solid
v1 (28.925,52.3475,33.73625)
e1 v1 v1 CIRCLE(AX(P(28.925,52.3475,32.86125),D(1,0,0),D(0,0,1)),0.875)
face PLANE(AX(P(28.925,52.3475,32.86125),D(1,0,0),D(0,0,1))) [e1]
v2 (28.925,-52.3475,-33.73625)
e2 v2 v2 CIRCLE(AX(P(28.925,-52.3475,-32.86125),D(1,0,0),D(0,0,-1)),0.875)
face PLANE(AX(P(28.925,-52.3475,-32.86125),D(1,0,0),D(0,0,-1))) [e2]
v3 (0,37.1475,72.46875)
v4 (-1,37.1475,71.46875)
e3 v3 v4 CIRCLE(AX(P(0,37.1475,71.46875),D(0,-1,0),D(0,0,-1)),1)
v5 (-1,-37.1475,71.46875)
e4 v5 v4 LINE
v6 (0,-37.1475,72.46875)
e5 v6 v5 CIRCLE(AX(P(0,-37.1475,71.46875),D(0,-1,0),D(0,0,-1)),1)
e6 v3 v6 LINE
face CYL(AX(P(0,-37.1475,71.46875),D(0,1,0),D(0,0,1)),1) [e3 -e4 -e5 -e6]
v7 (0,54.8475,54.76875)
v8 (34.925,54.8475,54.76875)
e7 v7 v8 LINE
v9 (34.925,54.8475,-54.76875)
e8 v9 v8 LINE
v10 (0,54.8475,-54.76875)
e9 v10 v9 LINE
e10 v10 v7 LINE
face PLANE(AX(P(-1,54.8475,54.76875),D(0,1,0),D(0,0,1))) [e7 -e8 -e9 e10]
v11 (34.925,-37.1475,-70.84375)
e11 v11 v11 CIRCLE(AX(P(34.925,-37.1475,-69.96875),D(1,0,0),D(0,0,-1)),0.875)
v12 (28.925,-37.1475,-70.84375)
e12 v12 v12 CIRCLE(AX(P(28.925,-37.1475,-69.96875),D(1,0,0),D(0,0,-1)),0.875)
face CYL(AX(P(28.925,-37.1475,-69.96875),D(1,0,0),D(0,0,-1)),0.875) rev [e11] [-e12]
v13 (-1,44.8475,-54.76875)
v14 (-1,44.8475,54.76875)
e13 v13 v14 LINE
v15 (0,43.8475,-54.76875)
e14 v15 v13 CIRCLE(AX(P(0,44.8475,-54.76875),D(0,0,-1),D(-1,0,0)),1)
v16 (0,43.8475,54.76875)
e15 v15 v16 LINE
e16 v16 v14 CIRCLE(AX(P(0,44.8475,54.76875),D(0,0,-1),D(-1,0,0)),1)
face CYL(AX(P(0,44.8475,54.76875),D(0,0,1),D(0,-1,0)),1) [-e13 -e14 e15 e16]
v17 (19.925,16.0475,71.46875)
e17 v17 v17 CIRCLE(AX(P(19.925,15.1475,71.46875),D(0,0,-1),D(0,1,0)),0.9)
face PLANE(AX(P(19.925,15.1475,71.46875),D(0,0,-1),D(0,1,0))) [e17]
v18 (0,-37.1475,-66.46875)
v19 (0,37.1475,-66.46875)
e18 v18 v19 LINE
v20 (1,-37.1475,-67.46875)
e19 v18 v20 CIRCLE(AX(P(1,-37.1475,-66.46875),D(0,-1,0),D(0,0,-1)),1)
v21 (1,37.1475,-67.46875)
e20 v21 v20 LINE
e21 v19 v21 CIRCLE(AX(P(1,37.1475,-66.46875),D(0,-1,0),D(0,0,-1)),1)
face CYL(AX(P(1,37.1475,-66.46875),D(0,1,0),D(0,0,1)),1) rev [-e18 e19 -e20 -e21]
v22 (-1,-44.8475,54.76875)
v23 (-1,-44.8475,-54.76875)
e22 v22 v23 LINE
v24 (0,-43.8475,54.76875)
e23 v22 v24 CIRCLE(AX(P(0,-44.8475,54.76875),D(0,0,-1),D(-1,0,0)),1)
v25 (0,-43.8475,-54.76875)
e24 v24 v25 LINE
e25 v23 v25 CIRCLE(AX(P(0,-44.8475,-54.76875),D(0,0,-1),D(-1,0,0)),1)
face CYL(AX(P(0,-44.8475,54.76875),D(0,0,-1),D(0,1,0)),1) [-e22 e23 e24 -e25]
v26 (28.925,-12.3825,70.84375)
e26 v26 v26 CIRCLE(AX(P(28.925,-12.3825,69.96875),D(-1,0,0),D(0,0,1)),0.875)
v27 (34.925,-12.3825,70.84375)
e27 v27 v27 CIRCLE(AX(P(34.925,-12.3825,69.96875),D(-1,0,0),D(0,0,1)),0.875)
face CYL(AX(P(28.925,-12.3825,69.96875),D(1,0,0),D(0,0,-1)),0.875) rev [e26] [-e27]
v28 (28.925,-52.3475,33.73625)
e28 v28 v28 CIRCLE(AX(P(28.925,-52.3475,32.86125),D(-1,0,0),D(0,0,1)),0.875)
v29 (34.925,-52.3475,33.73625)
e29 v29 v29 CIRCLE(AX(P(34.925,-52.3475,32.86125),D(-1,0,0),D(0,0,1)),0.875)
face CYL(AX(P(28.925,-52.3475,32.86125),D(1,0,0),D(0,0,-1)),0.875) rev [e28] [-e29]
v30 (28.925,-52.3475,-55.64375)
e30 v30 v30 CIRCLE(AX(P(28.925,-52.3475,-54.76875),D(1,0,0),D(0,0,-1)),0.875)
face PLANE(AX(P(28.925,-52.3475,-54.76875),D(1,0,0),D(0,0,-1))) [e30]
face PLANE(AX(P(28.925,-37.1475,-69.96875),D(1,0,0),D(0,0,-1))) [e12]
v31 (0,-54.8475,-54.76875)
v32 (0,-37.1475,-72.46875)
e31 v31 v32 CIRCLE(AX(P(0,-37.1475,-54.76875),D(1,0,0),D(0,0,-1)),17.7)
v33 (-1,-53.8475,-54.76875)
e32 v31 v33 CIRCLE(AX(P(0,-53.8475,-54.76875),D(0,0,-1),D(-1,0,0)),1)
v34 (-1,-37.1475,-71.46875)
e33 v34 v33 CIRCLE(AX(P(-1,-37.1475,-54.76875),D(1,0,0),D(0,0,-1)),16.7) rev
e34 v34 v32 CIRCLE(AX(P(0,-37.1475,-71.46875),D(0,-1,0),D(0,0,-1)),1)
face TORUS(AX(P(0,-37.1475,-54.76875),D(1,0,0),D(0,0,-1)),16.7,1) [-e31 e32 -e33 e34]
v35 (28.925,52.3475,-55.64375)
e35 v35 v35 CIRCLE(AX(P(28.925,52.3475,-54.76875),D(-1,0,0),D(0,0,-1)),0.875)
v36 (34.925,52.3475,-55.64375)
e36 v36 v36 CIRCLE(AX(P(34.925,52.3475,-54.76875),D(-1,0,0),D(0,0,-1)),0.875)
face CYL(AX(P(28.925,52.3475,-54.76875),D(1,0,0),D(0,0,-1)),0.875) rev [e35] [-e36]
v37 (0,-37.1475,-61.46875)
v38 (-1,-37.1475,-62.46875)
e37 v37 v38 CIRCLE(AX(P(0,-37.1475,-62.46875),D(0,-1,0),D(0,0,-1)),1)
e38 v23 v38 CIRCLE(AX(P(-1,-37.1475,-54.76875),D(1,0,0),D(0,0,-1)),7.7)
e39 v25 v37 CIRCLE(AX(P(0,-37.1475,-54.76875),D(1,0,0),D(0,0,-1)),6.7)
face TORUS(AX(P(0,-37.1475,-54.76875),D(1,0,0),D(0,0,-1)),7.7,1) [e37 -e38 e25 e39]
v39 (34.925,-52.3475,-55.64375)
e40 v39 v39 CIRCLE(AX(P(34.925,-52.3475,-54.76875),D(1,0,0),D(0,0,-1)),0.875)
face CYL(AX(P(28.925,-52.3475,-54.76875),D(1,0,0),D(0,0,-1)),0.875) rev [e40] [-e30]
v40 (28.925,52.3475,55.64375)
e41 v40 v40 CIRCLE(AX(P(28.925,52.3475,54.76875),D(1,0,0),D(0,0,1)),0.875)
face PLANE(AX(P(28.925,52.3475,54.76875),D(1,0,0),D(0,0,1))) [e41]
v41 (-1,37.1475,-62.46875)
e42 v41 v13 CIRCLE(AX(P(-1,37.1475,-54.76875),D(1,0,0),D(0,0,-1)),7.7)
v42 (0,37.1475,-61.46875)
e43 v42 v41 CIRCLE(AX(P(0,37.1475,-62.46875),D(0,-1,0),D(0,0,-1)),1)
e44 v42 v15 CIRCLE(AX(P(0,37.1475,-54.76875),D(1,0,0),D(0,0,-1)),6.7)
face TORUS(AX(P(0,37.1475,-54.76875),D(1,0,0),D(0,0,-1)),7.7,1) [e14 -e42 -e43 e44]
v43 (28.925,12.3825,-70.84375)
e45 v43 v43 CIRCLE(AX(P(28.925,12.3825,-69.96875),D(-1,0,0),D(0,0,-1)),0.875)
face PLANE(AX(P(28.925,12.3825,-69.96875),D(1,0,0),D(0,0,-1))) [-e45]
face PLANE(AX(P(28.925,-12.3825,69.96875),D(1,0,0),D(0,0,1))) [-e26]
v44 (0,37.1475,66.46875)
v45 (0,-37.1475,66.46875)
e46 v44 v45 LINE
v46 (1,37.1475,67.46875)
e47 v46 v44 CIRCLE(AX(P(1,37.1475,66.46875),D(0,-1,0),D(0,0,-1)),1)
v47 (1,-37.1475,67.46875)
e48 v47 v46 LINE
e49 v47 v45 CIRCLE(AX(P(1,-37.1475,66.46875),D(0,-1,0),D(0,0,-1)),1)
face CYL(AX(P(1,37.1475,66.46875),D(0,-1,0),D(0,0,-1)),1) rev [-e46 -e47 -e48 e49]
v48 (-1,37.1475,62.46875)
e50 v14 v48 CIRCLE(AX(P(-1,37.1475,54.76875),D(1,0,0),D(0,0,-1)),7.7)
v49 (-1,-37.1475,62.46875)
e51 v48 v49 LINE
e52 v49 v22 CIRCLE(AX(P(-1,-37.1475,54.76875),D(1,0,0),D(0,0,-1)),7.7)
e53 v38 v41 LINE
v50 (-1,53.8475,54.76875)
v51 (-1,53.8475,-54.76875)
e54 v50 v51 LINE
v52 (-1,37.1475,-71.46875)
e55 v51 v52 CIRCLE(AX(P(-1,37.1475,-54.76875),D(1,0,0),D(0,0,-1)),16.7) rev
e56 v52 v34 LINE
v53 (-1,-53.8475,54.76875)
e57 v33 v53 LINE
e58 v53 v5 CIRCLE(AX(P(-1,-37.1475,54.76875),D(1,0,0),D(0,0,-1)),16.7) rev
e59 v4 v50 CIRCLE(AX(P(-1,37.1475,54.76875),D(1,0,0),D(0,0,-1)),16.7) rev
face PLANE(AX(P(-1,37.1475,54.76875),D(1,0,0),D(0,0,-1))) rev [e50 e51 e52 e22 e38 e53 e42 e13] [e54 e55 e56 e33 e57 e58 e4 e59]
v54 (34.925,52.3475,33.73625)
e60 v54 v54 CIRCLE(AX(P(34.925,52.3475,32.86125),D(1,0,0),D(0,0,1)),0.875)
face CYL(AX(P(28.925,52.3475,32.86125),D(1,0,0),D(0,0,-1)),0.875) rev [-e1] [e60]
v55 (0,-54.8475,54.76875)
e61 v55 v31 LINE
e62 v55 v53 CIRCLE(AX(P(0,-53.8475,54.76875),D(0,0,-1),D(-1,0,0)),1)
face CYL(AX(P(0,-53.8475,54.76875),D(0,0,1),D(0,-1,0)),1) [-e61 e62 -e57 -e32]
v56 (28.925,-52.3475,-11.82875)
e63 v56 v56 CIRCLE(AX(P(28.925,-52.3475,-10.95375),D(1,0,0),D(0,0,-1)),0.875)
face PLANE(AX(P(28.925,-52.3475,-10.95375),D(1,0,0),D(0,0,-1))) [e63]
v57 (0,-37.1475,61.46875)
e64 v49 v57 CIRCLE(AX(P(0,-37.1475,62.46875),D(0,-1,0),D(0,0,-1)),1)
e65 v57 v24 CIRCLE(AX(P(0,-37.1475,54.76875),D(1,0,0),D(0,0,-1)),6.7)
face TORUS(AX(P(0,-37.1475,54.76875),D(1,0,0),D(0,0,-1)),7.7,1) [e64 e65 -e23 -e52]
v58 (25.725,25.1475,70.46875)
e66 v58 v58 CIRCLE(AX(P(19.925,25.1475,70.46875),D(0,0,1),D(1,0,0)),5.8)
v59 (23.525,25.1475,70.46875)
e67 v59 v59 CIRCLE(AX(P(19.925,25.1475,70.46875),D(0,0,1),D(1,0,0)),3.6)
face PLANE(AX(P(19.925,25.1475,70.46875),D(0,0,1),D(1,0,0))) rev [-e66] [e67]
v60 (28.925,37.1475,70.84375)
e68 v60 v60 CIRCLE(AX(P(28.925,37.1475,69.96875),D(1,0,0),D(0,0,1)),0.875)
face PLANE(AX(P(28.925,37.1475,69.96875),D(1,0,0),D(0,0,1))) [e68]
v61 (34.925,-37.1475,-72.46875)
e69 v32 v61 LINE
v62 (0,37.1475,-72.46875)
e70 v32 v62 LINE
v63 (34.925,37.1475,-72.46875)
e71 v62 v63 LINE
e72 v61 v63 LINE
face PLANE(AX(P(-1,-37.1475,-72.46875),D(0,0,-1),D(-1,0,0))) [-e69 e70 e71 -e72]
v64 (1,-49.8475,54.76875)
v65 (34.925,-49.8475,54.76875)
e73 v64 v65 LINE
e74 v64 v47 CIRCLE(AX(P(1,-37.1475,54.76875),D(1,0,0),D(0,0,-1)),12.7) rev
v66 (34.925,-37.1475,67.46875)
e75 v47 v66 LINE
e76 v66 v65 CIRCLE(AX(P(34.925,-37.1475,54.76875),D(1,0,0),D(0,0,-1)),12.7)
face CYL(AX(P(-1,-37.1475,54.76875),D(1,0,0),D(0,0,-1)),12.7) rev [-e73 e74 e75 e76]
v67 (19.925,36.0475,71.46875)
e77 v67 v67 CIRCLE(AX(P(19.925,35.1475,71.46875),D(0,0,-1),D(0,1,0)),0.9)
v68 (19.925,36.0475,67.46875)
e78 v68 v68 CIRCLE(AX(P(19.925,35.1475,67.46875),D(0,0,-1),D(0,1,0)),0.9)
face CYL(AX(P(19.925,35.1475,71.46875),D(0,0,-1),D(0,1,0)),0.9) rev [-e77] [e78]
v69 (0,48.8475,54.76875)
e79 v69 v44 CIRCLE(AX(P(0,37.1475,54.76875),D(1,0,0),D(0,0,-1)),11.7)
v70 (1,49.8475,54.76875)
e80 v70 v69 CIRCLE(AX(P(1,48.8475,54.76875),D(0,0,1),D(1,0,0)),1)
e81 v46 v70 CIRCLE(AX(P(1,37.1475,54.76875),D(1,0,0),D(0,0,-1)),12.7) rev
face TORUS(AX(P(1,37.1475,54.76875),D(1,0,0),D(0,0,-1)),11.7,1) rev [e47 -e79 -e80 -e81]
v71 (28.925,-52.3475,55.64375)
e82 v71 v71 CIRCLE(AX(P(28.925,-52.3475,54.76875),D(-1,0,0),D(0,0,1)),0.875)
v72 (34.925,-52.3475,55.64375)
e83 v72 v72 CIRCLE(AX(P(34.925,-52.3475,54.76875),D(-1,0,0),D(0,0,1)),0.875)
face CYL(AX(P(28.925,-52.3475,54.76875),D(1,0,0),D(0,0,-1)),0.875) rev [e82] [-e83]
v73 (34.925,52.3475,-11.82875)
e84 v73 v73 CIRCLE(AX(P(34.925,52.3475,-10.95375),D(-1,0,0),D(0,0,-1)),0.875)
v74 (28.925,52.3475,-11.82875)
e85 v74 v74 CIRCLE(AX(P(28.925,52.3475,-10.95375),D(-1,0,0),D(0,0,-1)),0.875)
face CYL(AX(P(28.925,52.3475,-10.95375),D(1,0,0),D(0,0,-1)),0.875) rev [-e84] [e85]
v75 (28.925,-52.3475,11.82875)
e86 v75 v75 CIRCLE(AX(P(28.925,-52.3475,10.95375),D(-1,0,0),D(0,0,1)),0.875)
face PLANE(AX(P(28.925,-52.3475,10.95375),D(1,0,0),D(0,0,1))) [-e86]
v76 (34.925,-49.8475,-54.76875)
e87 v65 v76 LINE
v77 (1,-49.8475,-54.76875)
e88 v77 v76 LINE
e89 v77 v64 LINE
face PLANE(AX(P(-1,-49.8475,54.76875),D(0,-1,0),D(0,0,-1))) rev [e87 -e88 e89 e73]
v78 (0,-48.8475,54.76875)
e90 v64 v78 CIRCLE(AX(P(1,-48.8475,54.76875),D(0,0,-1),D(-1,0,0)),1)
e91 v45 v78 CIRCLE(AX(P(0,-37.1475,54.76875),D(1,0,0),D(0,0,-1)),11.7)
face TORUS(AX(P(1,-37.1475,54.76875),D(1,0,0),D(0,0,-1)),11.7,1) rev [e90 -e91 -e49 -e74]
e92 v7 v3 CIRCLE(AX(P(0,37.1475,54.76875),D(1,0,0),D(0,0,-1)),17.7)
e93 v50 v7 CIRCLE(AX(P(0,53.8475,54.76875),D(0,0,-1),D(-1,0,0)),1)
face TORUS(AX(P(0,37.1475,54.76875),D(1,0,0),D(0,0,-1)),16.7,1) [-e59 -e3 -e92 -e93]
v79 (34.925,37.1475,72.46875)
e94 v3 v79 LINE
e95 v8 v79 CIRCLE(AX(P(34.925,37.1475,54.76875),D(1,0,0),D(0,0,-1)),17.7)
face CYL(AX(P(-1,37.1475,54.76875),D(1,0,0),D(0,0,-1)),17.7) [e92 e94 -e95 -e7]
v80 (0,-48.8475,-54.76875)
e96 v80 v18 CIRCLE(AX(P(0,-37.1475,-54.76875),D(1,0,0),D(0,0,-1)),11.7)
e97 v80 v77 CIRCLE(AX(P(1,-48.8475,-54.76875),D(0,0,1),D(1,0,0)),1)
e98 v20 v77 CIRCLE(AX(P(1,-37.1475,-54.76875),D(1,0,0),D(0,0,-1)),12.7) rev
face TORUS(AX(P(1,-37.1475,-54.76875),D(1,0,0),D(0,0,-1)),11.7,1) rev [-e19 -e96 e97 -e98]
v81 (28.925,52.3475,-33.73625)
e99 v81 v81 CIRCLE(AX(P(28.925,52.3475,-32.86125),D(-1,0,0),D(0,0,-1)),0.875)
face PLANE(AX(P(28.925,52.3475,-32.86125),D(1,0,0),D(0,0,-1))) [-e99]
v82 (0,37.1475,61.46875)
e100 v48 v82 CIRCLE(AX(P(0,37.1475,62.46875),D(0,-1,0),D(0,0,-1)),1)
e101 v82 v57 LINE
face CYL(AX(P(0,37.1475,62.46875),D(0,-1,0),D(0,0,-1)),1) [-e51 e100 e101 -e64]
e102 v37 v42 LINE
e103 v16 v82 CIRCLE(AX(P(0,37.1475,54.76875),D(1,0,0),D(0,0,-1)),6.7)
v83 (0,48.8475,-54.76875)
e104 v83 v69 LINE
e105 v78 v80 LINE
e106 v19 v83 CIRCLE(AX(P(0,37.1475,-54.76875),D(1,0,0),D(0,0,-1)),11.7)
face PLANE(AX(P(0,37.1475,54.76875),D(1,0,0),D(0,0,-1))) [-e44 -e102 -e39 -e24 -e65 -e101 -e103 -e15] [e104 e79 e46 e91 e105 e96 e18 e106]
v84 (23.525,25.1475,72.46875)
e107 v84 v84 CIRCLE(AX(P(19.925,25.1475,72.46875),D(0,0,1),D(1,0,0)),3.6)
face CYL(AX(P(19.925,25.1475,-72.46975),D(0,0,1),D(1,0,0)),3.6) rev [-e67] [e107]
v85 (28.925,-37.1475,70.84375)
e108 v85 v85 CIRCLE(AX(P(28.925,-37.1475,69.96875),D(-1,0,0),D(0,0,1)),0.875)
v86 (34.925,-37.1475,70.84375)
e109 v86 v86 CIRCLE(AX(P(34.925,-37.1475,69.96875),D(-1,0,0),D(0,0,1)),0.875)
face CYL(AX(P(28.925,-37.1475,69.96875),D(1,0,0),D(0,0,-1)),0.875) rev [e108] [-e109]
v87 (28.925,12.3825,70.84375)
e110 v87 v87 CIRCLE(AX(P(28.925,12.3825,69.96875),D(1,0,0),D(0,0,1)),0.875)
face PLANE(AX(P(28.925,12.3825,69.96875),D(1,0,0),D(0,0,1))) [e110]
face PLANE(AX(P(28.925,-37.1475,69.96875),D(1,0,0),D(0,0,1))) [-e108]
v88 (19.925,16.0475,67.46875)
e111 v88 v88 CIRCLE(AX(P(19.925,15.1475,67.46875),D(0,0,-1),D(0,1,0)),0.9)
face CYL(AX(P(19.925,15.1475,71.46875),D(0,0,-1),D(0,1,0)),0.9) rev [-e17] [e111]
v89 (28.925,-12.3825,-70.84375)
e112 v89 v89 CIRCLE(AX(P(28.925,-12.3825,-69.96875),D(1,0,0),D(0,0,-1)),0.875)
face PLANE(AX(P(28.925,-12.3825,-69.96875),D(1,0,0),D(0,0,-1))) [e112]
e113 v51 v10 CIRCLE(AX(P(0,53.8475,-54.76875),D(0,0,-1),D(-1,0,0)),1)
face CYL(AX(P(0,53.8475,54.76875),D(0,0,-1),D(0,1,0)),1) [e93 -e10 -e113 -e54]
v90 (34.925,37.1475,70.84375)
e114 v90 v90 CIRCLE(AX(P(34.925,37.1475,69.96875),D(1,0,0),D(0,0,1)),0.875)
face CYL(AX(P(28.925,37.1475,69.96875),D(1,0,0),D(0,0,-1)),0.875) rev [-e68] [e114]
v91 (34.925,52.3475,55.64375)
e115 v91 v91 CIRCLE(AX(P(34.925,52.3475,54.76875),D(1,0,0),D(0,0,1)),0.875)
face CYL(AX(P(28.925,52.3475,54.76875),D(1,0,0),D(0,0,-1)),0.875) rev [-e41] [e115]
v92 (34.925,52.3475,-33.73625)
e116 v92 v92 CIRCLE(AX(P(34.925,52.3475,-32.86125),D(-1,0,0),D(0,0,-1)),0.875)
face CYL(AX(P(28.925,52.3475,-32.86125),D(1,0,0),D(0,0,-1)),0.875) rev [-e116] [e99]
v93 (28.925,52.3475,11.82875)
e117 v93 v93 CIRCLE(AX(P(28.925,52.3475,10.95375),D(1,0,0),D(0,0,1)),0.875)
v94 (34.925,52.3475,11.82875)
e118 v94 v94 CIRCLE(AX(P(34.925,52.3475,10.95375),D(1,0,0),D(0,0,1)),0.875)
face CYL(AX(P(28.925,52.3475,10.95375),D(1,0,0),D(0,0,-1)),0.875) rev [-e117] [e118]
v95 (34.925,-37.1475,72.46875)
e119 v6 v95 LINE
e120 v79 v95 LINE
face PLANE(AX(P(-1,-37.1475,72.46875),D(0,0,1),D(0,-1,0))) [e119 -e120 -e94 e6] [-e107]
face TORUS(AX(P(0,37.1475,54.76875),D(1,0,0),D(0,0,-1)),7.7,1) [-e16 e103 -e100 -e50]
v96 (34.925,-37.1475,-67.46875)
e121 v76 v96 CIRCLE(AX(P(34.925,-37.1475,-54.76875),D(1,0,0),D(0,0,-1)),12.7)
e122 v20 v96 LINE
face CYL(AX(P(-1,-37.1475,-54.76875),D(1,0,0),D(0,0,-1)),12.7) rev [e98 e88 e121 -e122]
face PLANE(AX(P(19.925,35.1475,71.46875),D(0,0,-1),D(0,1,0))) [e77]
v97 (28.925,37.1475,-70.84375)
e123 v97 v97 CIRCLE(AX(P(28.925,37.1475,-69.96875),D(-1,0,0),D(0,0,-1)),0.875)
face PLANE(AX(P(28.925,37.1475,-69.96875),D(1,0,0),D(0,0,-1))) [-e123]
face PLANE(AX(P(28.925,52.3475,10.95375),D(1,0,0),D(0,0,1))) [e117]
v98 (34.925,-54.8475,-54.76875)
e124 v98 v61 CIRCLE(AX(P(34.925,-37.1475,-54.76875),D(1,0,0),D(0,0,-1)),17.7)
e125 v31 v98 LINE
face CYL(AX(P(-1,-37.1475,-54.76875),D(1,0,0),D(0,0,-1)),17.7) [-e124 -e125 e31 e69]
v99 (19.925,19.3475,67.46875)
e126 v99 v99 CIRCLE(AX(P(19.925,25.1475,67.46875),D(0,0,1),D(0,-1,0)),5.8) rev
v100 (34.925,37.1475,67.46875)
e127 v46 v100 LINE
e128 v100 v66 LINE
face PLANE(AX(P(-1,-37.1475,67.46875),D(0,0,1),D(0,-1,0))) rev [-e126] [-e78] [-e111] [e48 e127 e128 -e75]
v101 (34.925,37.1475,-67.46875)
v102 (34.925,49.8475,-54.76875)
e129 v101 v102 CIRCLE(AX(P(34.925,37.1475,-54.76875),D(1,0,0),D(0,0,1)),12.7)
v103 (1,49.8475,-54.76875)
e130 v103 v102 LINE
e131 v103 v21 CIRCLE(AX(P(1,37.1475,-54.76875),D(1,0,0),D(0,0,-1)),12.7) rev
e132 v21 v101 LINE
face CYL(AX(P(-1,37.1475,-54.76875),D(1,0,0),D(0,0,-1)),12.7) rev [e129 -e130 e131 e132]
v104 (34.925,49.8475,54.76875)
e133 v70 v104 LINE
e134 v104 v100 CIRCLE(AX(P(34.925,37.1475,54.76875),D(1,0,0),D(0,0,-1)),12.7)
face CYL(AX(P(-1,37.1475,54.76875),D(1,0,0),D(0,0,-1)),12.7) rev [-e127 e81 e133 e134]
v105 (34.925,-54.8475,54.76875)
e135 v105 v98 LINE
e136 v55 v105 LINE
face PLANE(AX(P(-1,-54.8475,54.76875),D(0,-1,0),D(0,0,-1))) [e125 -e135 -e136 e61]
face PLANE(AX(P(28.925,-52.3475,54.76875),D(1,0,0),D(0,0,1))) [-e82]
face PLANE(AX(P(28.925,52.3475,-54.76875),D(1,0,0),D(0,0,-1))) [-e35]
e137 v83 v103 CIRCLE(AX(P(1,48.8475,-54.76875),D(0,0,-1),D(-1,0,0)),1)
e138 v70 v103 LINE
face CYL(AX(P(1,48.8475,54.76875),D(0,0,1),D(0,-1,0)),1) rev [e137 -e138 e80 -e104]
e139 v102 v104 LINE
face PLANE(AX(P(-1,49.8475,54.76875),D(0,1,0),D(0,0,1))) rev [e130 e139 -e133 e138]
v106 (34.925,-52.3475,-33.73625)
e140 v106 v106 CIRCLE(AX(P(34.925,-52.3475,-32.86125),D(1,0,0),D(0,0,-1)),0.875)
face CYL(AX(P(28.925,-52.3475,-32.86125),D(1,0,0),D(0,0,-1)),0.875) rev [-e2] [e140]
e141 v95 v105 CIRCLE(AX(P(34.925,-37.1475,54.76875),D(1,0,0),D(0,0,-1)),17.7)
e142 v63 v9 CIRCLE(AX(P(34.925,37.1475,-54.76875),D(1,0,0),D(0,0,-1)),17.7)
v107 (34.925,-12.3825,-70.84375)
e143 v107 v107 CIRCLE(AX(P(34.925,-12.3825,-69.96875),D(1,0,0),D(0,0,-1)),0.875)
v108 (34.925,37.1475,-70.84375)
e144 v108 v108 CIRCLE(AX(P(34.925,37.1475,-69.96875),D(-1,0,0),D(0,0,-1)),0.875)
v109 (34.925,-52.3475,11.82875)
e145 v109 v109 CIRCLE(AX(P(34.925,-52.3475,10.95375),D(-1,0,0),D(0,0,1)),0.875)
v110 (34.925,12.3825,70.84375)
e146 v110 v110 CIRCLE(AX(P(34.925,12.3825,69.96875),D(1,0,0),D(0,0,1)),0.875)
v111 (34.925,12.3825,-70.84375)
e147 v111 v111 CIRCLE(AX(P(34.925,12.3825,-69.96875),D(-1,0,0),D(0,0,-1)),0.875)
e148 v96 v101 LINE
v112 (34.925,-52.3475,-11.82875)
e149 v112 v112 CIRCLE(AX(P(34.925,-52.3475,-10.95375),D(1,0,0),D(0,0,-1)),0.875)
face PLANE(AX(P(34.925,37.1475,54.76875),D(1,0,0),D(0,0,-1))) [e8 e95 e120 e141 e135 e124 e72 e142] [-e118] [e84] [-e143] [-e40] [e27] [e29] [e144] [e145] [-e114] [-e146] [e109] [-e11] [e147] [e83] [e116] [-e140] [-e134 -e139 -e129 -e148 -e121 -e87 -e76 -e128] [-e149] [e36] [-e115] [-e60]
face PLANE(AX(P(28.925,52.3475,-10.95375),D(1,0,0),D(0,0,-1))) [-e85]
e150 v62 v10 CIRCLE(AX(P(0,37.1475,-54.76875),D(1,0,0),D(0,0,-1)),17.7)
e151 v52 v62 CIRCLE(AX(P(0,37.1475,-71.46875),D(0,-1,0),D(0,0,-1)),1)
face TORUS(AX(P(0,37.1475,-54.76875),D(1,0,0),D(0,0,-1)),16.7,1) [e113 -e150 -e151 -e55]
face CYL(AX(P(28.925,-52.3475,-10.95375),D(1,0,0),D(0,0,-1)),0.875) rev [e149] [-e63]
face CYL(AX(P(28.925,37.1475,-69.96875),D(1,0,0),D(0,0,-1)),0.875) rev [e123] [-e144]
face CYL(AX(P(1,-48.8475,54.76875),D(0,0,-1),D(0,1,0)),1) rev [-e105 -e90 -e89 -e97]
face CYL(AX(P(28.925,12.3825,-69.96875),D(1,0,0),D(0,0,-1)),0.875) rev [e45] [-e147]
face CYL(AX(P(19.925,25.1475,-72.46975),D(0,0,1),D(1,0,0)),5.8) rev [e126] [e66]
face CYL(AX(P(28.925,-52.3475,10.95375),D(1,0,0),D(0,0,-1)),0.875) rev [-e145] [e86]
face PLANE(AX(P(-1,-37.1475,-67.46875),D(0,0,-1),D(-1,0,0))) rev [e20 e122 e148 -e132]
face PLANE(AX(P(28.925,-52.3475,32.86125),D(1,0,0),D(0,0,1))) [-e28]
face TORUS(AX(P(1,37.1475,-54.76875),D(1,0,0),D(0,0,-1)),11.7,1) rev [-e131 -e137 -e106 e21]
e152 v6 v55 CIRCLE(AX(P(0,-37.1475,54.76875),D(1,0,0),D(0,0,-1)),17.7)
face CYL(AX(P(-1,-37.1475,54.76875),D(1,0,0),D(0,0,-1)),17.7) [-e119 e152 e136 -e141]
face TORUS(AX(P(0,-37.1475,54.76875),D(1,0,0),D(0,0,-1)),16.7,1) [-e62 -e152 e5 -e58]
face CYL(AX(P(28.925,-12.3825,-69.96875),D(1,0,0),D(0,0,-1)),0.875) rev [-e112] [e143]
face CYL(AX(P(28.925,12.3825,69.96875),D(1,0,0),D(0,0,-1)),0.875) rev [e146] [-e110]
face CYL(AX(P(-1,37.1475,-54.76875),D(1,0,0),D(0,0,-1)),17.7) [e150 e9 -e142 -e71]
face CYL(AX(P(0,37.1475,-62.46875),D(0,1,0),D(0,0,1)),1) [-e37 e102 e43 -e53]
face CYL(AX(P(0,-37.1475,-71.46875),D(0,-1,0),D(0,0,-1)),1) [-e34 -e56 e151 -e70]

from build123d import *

# Parameters (mm, degrees)
EXTRUDE_THIN1_DEPTH      = 34.925
EXTRUDE_THIN1_DEPTH_BACK = 1
EXTRUDE_THIN2_START      = -1
EXTRUDE_THIN2_DEPTH      = 1
FILLET1_R                = 1
SKETCH2_R                = 0.875
CUT_EXTRUDE1_DEPTH       = 6
MIRROR2_COPY_1_SKETCH_R  = 0.875
MIRROR2_COPY_1_DEPTH     = 6
CUT_EXTRUDE2_REACH       = 160.855
SKETCH3_R                = 3.6
CUT_EXTRUDE3_REACH       = 162.855
CUT_EXTRUDE3_START       = -2
SKETCH4_R                = 5.8
SKETCH5_R                = 0.9
CUT_EXTRUDE4_DEPTH       = 4


with BuildPart() as part:
    # Sketch1 → Extrude-Thin1 (new, two sides: drawn at the far end of the back side and taken through both)
    with BuildSketch(Plane(origin=(0, 0, 0), x_dir=(0, 0, -1), z_dir=(1, 0, 0)).offset(-EXTRUDE_THIN1_DEPTH_BACK)):
        with BuildLine():
            Line((72.46875, -37.1475), (72.46875, 37.1475))
            ThreePointArc((72.46875, 37.1475), (67.284540027, 49.663290027), (54.76875, 54.8475))
            Line((54.76875, 54.8475), (-54.76875, 54.8475))
            ThreePointArc((-54.76875, 54.8475), (-67.284540027, 49.663290027), (-72.46875, 37.1475))
            Line((-72.46875, 37.1475), (-72.46875, -37.1475))
            ThreePointArc((-72.46875, -37.1475), (-67.284540027, -49.663290027), (-54.76875, -54.8475))
            Line((-54.76875, -54.8475), (54.76875, -54.8475))
            ThreePointArc((54.76875, -54.8475), (67.284540027, -49.663290027), (72.46875, -37.1475))
        make_face()
        with BuildLine():
            Line((67.46875, -37.1475), (67.46875, 37.1475))
            ThreePointArc((67.46875, 37.1475), (63.749006121, 46.127756121), (54.76875, 49.8475))
            Line((54.76875, 49.8475), (-54.76875, 49.8475))
            ThreePointArc((-54.76875, 49.8475), (-63.749006121, 46.127756121), (-67.46875, 37.1475))
            Line((-67.46875, 37.1475), (-67.46875, -37.1475))
            ThreePointArc((-67.46875, -37.1475), (-63.749006121, -46.127756121), (-54.76875, -49.8475))
            Line((-54.76875, -49.8475), (54.76875, -49.8475))
            ThreePointArc((54.76875, -49.8475), (63.749006121, -46.127756121), (67.46875, -37.1475))
        make_face(mode=Mode.SUBTRACT)
    extrude(amount=EXTRUDE_THIN1_DEPTH + EXTRUDE_THIN1_DEPTH_BACK)

    # Sketch1<2> → Extrude-Thin2 (add)
    with BuildSketch(Plane(origin=(0, 0, 0), x_dir=(0, 0, -1), z_dir=(1, 0, 0)).offset(EXTRUDE_THIN2_START)):
        with BuildLine():
            Line((67.46875, -37.1475), (67.46875, 37.1475))
            ThreePointArc((67.46875, 37.1475), (63.749006121, 46.127756121), (54.76875, 49.8475))
            Line((54.76875, 49.8475), (-54.76875, 49.8475))
            ThreePointArc((-54.76875, 49.8475), (-63.749006121, 46.127756121), (-67.46875, 37.1475))
            Line((-67.46875, 37.1475), (-67.46875, -37.1475))
            ThreePointArc((-67.46875, -37.1475), (-63.749006121, -46.127756121), (-54.76875, -49.8475))
            Line((-54.76875, -49.8475), (54.76875, -49.8475))
            ThreePointArc((54.76875, -49.8475), (63.749006121, -46.127756121), (67.46875, -37.1475))
        make_face()
        with BuildLine():
            Line((61.46875, -37.1475), (61.46875, 37.1475))
            ThreePointArc((61.46875, 37.1475), (59.506365434, 41.885115434), (54.76875, 43.8475))
            Line((54.76875, 43.8475), (-54.76875, 43.8475))
            ThreePointArc((-54.76875, 43.8475), (-59.506365434, 41.885115434), (-61.46875, 37.1475))
            Line((-61.46875, 37.1475), (-61.46875, -37.1475))
            ThreePointArc((-61.46875, -37.1475), (-59.506365434, -41.885115434), (-54.76875, -43.8475))
            Line((-54.76875, -43.8475), (54.76875, -43.8475))
            ThreePointArc((54.76875, -43.8475), (59.506365434, -41.885115434), (61.46875, -37.1475))
        make_face(mode=Mode.SUBTRACT)
    extrude(amount=EXTRUDE_THIN2_DEPTH)

    # Fillet1
    fillet1_edges = [part.edges().sort_by_distance(p)[0] for p in [
        (-1, -49.663290027, -67.284540027),
        (-1, -54.8475, 0),
        (-1, -49.663290027, 67.284540027),
        (-1, 0, 72.46875),
        (-1, 49.663290027, 67.284540027),
        (-1, 54.8475, 0),
        (-1, 49.663290027, -67.284540027),
        (-1, 0, -72.46875),
        (-1, -41.885115434, -59.506365434),
        (-1, -43.8475, 0),
        (-1, -41.885115434, 59.506365434),
        (-1, 0, 61.46875),
        (-1, 41.885115434, 59.506365434),
        (-1, 43.8475, 0),
        (-1, 41.885115434, -59.506365434),
        (-1, 0, -61.46875),
        (0, 49.8475, 0),
        (0, 46.127756121, -63.749006121),
        (0, 0, -67.46875),
        (0, -46.127756121, -63.749006121),
        (0, -49.8475, 0),
        (0, -46.127756121, 63.749006121),
        (0, 0, 67.46875),
        (0, 46.127756121, 63.749006121),
    ]]
    fillet(fillet1_edges, radius=FILLET1_R - 0.0001)  # a hair under: the kernel refuses the full size

    # Sketch2 → Cut-Extrude1 (cut)
    with BuildSketch(Plane(origin=(34.925, 0, 0), x_dir=(0, 0, -1), z_dir=(1, 0, 0))):
        with Locations((69.96875, -37.1475)):
            Circle(SKETCH2_R)
        with Locations((69.96875, -12.3825)):
            Circle(SKETCH2_R)
        with Locations((54.76875, -52.3475)):
            Circle(SKETCH2_R)
        with Locations((10.95375, -52.3475)):
            Circle(SKETCH2_R)
        with Locations((32.86125, -52.3475)):
            Circle(SKETCH2_R)
    cut_extrude1 = extrude(amount=-CUT_EXTRUDE1_DEPTH, mode=Mode.SUBTRACT)

    # Mirror1: Cut-Extrude1 across plane
    add(cut_extrude1.mirror(Plane.XY), mode=Mode.SUBTRACT)

    # Mirror2: Cut-Extrude1 across plane
    add(cut_extrude1.mirror(Plane.ZX), mode=Mode.SUBTRACT)

    # Mirror2 copy 1 sketch → Mirror2 copy 1 (cut)
    with BuildSketch(Plane(origin=(34.925, 0, 0), x_dir=(0, 0, 1), z_dir=(1, 0, 0))):
        with Locations((69.96875, -37.1475)):
            Circle(MIRROR2_COPY_1_SKETCH_R)
        with Locations((69.96875, -12.3825)):
            Circle(MIRROR2_COPY_1_SKETCH_R)
        with Locations((54.76875, -52.3475)):
            Circle(MIRROR2_COPY_1_SKETCH_R)
        with Locations((10.95375, -52.3475)):
            Circle(MIRROR2_COPY_1_SKETCH_R)
        with Locations((32.86125, -52.3475)):
            Circle(MIRROR2_COPY_1_SKETCH_R)
    extrude(amount=-MIRROR2_COPY_1_DEPTH, mode=Mode.SUBTRACT)

    # Sketch3 → Cut-Extrude2 (cut, up to next)
    with BuildSketch(Plane.XY.offset(72.46875), mode=Mode.PRIVATE) as cut_extrude2_sk1:
        with Locations((19.925, 25.1475)):
            Circle(SKETCH3_R)
    cut_extrude2_tool1 = extrude(cut_extrude2_sk1.sketch, amount=-CUT_EXTRUDE2_REACH, mode=Mode.PRIVATE) & part.part
    add(cut_extrude2_tool1.solids().sort_by_distance((19.925, 25.1475, 72.46875))[0], mode=Mode.SUBTRACT)

    # Sketch4 → Cut-Extrude3 (cut, up to next)
    with BuildSketch(Plane.XY.offset(72.46875).offset(CUT_EXTRUDE3_START), mode=Mode.PRIVATE) as cut_extrude3_sk1:
        with Locations((19.925, 25.1475)):
            Circle(SKETCH4_R)
    cut_extrude3_tool1 = extrude(cut_extrude3_sk1.sketch, amount=-CUT_EXTRUDE3_REACH, mode=Mode.PRIVATE) & part.part
    add(cut_extrude3_tool1.solids().sort_by_distance((19.925, 25.1475, 70.46875))[0], mode=Mode.SUBTRACT)

    # Sketch5 → Cut-Extrude4 (cut)
    with BuildSketch(Plane(origin=(0, 0, 67.46875), x_dir=(-1, 0, 0), z_dir=(0, 0, -1))):
        with Locations(Location((-19.925, 35.1475, 0), (0, 0, 90))):
            Circle(SKETCH5_R)
        with Locations(Location((-19.925, 15.1475, 0), (0, 0, 90))):
            Circle(SKETCH5_R)
    extrude(amount=-CUT_EXTRUDE4_DEPTH, mode=Mode.SUBTRACT)


solid = part.part
